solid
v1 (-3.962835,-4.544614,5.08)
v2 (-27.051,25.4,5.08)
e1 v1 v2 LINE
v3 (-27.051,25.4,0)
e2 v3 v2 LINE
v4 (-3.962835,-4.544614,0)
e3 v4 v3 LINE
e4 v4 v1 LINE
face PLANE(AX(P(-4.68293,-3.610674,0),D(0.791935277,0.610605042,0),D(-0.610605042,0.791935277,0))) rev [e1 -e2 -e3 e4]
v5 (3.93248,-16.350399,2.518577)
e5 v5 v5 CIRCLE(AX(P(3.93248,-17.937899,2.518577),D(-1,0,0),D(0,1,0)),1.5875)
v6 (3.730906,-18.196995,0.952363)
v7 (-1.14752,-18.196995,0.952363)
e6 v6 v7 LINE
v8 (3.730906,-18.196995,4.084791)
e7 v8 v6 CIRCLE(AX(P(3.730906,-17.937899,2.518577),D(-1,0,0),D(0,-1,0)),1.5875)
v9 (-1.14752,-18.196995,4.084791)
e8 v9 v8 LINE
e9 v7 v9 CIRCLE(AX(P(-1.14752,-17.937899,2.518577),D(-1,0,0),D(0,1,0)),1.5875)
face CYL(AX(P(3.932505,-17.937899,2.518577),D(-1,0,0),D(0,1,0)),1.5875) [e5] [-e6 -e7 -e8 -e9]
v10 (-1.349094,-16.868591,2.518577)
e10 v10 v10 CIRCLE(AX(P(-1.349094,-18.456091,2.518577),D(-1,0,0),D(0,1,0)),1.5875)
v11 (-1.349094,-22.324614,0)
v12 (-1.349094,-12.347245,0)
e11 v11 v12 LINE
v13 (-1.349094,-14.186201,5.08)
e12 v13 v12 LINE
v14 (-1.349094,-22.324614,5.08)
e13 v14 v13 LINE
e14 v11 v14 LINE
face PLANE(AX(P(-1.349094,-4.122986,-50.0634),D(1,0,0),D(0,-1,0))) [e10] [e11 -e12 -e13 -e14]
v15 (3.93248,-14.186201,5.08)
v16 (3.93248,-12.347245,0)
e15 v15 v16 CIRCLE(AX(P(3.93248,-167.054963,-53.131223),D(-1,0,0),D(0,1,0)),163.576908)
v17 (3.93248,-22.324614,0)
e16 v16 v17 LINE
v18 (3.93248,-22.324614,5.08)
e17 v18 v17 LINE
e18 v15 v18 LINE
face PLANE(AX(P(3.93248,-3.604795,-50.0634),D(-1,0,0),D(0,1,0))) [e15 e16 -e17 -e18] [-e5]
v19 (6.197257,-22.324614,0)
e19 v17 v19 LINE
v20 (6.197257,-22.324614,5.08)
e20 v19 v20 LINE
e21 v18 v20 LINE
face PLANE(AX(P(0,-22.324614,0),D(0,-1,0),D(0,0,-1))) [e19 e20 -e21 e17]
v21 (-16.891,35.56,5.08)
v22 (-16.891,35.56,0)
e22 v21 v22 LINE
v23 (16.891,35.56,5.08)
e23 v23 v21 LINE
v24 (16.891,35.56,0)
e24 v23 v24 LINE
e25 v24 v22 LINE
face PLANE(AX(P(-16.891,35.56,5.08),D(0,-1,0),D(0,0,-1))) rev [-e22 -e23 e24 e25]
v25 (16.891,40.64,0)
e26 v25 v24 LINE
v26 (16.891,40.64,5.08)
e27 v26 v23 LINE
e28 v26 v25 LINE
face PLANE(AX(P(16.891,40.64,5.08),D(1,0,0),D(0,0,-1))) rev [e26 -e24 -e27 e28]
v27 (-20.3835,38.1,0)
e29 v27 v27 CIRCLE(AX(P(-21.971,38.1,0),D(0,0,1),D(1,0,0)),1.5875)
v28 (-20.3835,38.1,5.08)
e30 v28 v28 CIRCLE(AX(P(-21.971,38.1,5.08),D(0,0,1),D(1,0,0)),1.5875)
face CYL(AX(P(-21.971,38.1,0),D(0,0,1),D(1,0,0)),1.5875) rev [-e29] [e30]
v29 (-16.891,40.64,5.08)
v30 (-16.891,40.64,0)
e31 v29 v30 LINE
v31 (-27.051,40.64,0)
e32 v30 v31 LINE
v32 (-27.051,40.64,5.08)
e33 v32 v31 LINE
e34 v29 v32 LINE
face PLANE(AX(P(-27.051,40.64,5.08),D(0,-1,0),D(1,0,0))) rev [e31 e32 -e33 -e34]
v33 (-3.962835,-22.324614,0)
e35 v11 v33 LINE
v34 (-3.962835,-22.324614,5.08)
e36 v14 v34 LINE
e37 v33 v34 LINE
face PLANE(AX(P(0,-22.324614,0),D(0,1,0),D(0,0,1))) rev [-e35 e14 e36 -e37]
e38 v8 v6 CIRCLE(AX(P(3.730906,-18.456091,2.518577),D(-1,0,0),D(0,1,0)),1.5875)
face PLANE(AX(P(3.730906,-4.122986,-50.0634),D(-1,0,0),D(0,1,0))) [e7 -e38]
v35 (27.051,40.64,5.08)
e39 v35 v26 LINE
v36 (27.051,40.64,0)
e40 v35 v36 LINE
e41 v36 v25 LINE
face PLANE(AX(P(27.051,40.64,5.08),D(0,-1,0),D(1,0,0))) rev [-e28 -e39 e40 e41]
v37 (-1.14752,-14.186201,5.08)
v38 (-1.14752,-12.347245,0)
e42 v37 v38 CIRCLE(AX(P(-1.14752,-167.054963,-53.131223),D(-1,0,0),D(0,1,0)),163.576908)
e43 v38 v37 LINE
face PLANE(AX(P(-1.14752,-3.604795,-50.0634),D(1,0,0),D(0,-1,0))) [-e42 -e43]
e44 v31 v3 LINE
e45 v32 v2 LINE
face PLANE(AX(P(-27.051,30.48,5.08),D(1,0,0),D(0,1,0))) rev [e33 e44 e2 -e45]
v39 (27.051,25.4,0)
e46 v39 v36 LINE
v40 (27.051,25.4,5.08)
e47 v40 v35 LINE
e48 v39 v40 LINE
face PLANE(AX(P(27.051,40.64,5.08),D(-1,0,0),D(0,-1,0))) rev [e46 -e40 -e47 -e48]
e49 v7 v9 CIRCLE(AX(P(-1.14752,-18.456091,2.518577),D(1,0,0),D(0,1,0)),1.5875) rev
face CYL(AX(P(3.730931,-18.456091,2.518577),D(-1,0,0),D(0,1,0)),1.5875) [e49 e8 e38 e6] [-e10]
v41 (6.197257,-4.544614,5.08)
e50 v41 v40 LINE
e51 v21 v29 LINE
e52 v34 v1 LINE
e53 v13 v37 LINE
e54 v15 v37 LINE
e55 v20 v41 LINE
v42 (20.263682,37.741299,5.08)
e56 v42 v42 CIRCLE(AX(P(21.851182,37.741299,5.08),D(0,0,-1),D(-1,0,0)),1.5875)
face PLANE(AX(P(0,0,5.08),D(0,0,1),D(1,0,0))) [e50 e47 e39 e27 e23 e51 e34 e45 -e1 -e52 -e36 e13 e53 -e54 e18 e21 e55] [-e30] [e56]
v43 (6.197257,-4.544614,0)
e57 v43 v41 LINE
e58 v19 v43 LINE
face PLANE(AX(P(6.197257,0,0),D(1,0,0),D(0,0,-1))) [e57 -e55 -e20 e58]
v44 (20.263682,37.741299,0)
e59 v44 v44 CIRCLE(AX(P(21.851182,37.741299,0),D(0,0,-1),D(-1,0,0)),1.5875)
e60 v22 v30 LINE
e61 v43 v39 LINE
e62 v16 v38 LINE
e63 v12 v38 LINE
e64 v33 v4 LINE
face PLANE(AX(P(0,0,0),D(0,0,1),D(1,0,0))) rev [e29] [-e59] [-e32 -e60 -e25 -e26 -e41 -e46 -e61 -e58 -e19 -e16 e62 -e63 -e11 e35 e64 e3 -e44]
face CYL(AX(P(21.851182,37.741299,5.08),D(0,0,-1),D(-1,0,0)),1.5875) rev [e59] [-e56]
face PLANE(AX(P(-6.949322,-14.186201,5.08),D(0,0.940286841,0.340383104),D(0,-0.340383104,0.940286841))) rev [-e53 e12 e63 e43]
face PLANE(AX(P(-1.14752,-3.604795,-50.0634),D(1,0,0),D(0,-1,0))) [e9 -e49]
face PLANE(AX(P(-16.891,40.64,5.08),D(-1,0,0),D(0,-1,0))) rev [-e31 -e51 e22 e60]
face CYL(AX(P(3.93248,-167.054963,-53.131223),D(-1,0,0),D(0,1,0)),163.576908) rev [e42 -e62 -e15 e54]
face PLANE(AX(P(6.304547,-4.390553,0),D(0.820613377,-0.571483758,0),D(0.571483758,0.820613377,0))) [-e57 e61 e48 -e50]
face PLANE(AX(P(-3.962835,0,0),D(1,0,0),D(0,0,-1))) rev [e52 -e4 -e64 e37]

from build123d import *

# Parameters (mm, degrees)
BOSS_EXTRUDE1_DEPTH = 5.08
SKETCH2_R           = 1.5875
CUT_EXTRUDE1_DEPTH  = 50.083323044
SKETCH3_R           = 1.5875
CUT_EXTRUDE2_DEPTH  = 50.083323044
CAVITY1_START       = -1.349094449
CAVITY1_OUTLINE_R   = 1.5875
CAVITY1_DEPTH       = 5.08
CUT_EXTRUDE4_DEPTH  = 50.083323044
CAVITY3_START       = -1.147520379
CAVITY3_OUTLINE_R   = 1.5875
CAVITY3_DEPTH       = 5.08
CUT_EXTRUDE5_DEPTH  = 0.20157407


# Read off the part's stored shape, not the designer's step: Cavity1, Cavity3
with BuildPart() as part:
    # Sketch1 → Boss-Extrude1 (new body)
    with BuildSketch(Plane.XY):
        Polygon((-27.051, 40.64), (-16.891, 40.64), (-16.891, 35.56), (16.891, 35.56), (16.891, 40.64), (27.051, 40.64), (27.051, 30.48), (27.051, -40.64), (-27.051, -40.64), (-27.051, 30.48), align=None)
    extrude(amount=BOSS_EXTRUDE1_DEPTH)

    # Sketch2 → Cut-Extrude1 (cut, through all)
    with BuildSketch(Plane.XY.offset(5.08)):
        with Locations((-21.971, 38.1)):
            Circle(SKETCH2_R)
    extrude(amount=-CUT_EXTRUDE1_DEPTH, mode=Mode.SUBTRACT)

    # Sketch3 → Cut-Extrude2 (cut, through all)
    with BuildSketch(Plane(origin=(0, 0, 0), x_dir=(-1, 0, 0), z_dir=(0, 0, -1))):
        with Locations((-21.851181845, 37.741299139)):
            Circle(SKETCH3_R)
    extrude(amount=-CUT_EXTRUDE2_DEPTH, mode=Mode.SUBTRACT)

    # Cavity1 outline → Cavity1 (cut)
    with BuildSketch(Plane.YZ.offset(CAVITY1_START)):
        with BuildLine():
            Line((-14.704392822, 5.08), (-26.073978973, 5.08))
            ThreePointArc((-26.073978973, 5.08), (-25.829625006, 2.541825867), (-25.626750522, 0))
            Line((-25.626750522, 0), (-12.865436781, 0))
            ThreePointArc((-12.865436781, 0), (-13.763940636, 2.547592632), (-14.704392822, 5.08))
        make_face()
        with Locations((-18.456090827, 2.518577165)):
            Circle(CAVITY1_OUTLINE_R, mode=Mode.SUBTRACT)
    extrude(amount=CAVITY1_DEPTH, mode=Mode.SUBTRACT)

    # Sketch4 → Cut-Extrude4 (cut, through all)
    with BuildSketch(Plane.XY.offset(5.08)):
        Polygon((-3.962834865, -4.544614252), (-27.051, 25.4), (-27.051, -40.64), (27.051, -40.64), (27.051, 25.4), (6.197256749, -4.544614252), (6.197256749, -22.324614252), (3.730905551, -22.324614252), (3.730905551, -26.073978973), (-1.349094449, -26.073978973), (-1.349094449, -22.324614252), (-3.962834865, -22.324614252), align=None)
    extrude(amount=-CUT_EXTRUDE4_DEPTH, mode=Mode.SUBTRACT)


with BuildPart() as cut_extrude4_kept_piece:
    # of the separate pieces the step leaves, the one the design keeps (cut_extrude4_pieces_kept)
    add(part.part.solids().sort_by_distance((-27.051, 40.64, 0))[0])

    # Cavity3 outline → Cavity3 (cut)
    with BuildSketch(Plane.YZ.offset(CAVITY3_START)):
        with BuildLine():
            ThreePointArc((-12.347244957, 0), (-13.245748811, 2.547592632), (-14.186200998, 5.08))
            Line((-14.186200998, 5.08), (-22.324614252, 5.08))
            Line((-22.324614252, 5.08), (-22.324614252, 0))
            Line((-22.324614252, 0), (-12.347244957, 0))
        make_face()
        with Locations((-17.937899002, 2.518577165)):
            Circle(CAVITY3_OUTLINE_R, mode=Mode.SUBTRACT)
    extrude(amount=CAVITY3_DEPTH, mode=Mode.SUBTRACT)

    # Sketch7 → Cut-Extrude5 (cut)
    with BuildSketch(Plane(origin=(-1.147520379, 0, 0), x_dir=(0, 0, -1), z_dir=(1, 0, 0))):
        Polygon((-5.08, -14.186200998), (0, -12.347244957), (0, -12.865436781), (-5.08, -14.704392822), align=None)
    extrude(amount=-CUT_EXTRUDE5_DEPTH, mode=Mode.SUBTRACT)


solid = cut_extrude4_kept_piece.part
